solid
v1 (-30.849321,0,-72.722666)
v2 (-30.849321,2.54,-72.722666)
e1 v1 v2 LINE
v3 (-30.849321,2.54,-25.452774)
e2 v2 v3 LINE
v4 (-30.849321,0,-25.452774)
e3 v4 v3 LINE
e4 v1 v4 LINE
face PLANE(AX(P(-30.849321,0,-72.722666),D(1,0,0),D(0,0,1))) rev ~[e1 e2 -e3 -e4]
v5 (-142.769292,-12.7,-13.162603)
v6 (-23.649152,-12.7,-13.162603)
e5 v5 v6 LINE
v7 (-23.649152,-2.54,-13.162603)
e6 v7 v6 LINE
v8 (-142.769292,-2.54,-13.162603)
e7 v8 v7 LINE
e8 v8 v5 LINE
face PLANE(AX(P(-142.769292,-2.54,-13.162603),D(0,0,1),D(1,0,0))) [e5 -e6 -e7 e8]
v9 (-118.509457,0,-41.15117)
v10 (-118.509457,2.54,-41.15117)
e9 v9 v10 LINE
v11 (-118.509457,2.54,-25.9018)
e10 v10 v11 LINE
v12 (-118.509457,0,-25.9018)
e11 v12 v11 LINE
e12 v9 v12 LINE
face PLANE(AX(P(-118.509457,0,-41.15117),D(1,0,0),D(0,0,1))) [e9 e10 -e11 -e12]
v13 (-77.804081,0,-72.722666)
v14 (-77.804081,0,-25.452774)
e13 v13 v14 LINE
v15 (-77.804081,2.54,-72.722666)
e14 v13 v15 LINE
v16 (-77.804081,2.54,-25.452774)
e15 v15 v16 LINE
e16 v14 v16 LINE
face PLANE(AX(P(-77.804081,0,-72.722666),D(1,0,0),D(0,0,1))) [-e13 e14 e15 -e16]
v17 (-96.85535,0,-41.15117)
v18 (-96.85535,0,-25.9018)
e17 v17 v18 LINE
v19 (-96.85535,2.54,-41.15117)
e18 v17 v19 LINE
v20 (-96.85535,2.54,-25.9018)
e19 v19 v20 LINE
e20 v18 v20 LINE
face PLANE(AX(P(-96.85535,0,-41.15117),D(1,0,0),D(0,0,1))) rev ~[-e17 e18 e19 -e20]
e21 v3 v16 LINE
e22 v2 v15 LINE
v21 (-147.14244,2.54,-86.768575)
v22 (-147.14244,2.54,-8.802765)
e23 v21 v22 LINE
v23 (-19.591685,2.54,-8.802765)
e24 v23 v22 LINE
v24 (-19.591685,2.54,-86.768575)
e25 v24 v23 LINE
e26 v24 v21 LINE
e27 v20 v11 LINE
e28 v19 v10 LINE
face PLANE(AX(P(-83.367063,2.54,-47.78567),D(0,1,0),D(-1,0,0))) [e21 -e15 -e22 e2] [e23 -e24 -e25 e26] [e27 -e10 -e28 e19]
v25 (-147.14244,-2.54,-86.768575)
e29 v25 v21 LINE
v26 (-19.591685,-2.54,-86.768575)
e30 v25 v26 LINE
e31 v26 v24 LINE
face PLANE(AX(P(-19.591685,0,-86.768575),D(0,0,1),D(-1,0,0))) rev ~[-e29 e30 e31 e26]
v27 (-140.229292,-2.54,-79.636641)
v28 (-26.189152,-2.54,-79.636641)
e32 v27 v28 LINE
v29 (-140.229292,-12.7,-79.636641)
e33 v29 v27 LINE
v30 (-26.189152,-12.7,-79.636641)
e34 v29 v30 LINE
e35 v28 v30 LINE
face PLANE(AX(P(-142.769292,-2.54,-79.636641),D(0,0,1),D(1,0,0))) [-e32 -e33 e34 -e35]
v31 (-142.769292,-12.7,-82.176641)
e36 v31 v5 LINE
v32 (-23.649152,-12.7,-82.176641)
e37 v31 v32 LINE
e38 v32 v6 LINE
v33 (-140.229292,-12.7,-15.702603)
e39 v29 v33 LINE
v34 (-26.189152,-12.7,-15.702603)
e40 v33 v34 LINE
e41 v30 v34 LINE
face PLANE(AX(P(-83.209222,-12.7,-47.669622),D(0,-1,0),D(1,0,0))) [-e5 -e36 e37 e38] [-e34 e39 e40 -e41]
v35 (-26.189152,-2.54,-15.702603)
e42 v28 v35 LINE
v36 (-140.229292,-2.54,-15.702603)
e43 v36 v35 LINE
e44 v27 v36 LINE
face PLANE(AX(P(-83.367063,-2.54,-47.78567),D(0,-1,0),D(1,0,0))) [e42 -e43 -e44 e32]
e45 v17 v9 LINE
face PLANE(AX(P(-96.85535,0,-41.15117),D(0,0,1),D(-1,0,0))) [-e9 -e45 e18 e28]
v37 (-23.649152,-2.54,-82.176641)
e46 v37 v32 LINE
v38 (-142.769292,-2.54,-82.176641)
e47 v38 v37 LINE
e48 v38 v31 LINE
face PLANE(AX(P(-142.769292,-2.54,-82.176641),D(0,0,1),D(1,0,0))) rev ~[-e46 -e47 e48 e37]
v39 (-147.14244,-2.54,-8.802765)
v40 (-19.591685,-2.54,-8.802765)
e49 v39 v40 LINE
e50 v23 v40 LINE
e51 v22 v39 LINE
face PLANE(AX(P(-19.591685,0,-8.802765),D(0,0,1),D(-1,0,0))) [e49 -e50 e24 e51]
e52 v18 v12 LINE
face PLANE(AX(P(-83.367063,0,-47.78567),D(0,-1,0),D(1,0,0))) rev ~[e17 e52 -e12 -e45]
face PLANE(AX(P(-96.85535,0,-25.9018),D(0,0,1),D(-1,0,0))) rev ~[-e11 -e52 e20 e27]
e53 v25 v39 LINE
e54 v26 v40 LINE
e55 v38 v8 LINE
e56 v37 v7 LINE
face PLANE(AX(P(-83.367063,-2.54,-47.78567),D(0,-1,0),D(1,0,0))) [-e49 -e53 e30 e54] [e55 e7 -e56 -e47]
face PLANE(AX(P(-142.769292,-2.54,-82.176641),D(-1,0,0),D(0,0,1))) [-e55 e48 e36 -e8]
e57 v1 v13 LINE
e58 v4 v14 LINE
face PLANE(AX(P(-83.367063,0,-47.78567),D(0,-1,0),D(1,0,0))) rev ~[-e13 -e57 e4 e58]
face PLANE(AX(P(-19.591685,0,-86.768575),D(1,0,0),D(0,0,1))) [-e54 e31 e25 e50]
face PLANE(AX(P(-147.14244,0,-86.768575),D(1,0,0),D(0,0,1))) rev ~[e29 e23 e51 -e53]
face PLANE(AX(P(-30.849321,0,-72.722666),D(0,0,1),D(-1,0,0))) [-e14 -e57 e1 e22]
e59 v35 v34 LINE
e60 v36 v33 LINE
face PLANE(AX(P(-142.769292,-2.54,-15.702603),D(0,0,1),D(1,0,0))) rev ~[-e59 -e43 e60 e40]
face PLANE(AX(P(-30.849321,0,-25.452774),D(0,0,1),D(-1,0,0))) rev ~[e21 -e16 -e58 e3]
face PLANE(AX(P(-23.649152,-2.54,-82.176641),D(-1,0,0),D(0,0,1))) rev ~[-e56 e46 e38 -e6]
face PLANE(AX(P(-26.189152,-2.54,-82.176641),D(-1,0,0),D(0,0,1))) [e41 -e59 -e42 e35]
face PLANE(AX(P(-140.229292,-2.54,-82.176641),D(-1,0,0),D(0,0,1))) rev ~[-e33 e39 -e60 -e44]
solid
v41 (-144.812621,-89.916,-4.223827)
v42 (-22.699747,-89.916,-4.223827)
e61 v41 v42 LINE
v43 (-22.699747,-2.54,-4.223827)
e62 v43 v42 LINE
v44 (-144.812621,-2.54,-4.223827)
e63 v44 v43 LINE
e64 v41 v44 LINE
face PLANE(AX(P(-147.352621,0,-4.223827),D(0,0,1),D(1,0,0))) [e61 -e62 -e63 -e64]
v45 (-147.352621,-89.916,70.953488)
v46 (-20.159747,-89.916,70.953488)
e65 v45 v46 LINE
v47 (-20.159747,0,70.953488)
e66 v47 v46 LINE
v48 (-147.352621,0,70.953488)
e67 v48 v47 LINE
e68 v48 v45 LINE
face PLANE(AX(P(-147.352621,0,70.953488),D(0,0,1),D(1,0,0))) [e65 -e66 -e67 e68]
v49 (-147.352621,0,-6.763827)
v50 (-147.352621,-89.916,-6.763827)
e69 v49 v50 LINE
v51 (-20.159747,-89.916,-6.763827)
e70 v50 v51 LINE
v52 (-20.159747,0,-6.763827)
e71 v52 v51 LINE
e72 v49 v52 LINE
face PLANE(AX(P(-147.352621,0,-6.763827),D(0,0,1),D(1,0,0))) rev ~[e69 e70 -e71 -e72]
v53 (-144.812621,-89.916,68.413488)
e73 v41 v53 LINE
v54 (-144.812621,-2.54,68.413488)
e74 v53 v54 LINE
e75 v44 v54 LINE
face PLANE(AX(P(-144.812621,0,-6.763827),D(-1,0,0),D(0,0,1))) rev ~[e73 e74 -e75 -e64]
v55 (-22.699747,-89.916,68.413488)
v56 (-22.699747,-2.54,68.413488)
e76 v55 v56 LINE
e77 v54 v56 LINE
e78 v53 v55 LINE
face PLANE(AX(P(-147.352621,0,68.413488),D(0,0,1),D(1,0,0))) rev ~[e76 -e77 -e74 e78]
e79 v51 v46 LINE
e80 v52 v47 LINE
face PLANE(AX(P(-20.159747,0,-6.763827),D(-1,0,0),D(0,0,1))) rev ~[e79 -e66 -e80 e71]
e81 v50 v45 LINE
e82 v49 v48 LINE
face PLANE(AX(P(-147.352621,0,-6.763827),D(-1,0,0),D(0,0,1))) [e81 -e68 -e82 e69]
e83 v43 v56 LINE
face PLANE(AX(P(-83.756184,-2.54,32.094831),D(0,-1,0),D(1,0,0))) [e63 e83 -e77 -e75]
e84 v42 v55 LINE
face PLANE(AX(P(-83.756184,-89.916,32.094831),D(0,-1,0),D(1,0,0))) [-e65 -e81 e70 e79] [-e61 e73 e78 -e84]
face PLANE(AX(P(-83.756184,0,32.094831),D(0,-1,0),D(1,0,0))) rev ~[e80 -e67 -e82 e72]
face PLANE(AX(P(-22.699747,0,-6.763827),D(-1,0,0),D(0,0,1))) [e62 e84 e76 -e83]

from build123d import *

# Parameters (mm, degrees)
F0_W        = 127.1928735077
F0_H        = 77.7173149399
F1_DEPTH    = 89.916
F2_T        = -2.54
F3_W        = 127.5507546961
F3_H        = 77.9658099636
F4_DEPTH    = 2.54
F5_W        = 119.1201396286
F5_H        = 69.0140379593
F6_DEPTH    = 10.16
F9_T        = 2.54
F9_T3_DEPTH = 124.2001396286
F9_T5_DEPTH = 74.0940379593
F8_W        = 127.5507546961
F8_H        = 77.9658099636
F8_W_2      = 46.9547603279
F8_H_2      = 47.2698919475
F8_W_3      = 21.6541066766
F8_H_3      = 15.249369666
F10_DEPTH   = 2.54


# Not quite as in the source:
# - a shell that OpenCascade refuses in one call is made with other operations: the cavity is built on its own and cut out


with BuildPart() as f1:
    # F0 (on Front) → F1 (new body)
    with BuildSketch(Plane.XZ):
        with Locations((-83.7561842054, 32.0948308799)):
            Rectangle(F0_W, F0_H)
    extrude(amount=F1_DEPTH)

    # F2
    f2_openings = [f1.faces().sort_by_distance(p)[0] for p in [
        (-83.756184, -89.916, 32.094831),
    ]]
    offset(amount=F2_T, openings=f2_openings)


with BuildPart() as f4:
    # F3 (on Front) → F4 (new body)
    with BuildSketch(Plane.XZ):
        with Locations((-83.3670627326, -47.7856700309)):
            Rectangle(F3_W, F3_H)
    extrude(amount=F4_DEPTH)

    # F5 (on face) → F6 (join)
    with BuildSketch(Plane.XZ.offset(2.54)):
        with Locations((-83.2092221826, -47.6696216501)):
            Rectangle(F5_W, F5_H)
    extrude(amount=F6_DEPTH)

    # F9: shell of thickness 2.54, made by hand


with BuildPart() as f9_core1:
    # F9_t2: copy of F4
    add(f4.part)

    # the walls: a layer under each face that stays
    f9_faces = [f9_core1.faces().sort_by_distance(p)[0] for p in [
        (-83.3670627326, -1.27, -8.802765049),
        (-19.5916853845, -1.27, -47.7856700309),
        (-147.1424400806, -1.27, -47.7856700309),
        (-83.3670627326, 0, -47.7856700309),
        (-142.8907482574, -2.54, -84.1697146806),
        (-83.3670627326, -1.27, -86.7685750127),
        (-83.2092221826, -7.62, -13.1626026705),
        (-142.769291997, -7.62, -47.6696216501),
        (-83.2092221826, -7.62, -82.1766406298),
        (-23.6491523683, -7.62, -47.6696216501),
    ]]
    thicken(f9_faces, amount=-F9_T, mode=Mode.SUBTRACT)

    # F9_s4 → F9_t3 (cut)
    with BuildSketch(Plane.YZ.offset(-145.309291997)):
        Polygon((-2.5654, -13.1372026705), (0, -13.1626026705), (0, -15.7026026705), (-2.54, -15.7026026705), align=None)
        Polygon((-2.5654, -82.2020406298), (0, -82.1766406298), (0, -79.6366406298), (-2.54, -79.6366406298), align=None)
    extrude(amount=F9_T3_DEPTH, mode=Mode.SUBTRACT)

    # F9_s6 → F9_t5 (cut)
    with BuildSketch(Plane.XY.offset(-84.7166406298)):
        Polygon((-142.794691997, -2.5654), (-142.769291997, 0), (-140.229291997, 0), (-140.229291997, -2.54), align=None)
        Polygon((-23.6237523683, -2.5654), (-23.6491523683, 0), (-26.1891523683, 0), (-26.1891523683, -2.54), align=None)
    extrude(amount=F9_T5_DEPTH, mode=Mode.SUBTRACT)


with BuildPart() as f4_1:
    add(f4.part)

    # what is left inside the walls is the cavity
    f9_cavity = [f9_core1.part.solids().sort_by_distance(p)[0] for p in [
        (-83.209222, -2.5654, -58.325295),
    ]]
    add(f9_cavity, mode=Mode.SUBTRACT)

    # F8 (on face) → F10 (join)
    with BuildSketch(Plane(origin=(0, 0, 0), x_dir=(-1, 0, 0), z_dir=(0, 1, 0))):
        with Locations((83.3670627326, -47.7856700309)):
            Rectangle(F8_W, F8_H)
        with Locations((54.326700978, -49.0877199918)):
            Rectangle(F8_W_2, F8_H_2, mode=Mode.SUBTRACT)
        with Locations((107.682403177, -33.5264848545)):
            Rectangle(F8_W_3, F8_H_3, mode=Mode.SUBTRACT)
    extrude(amount=F10_DEPTH)


solid = Compound([f1.part, f4_1.part])
